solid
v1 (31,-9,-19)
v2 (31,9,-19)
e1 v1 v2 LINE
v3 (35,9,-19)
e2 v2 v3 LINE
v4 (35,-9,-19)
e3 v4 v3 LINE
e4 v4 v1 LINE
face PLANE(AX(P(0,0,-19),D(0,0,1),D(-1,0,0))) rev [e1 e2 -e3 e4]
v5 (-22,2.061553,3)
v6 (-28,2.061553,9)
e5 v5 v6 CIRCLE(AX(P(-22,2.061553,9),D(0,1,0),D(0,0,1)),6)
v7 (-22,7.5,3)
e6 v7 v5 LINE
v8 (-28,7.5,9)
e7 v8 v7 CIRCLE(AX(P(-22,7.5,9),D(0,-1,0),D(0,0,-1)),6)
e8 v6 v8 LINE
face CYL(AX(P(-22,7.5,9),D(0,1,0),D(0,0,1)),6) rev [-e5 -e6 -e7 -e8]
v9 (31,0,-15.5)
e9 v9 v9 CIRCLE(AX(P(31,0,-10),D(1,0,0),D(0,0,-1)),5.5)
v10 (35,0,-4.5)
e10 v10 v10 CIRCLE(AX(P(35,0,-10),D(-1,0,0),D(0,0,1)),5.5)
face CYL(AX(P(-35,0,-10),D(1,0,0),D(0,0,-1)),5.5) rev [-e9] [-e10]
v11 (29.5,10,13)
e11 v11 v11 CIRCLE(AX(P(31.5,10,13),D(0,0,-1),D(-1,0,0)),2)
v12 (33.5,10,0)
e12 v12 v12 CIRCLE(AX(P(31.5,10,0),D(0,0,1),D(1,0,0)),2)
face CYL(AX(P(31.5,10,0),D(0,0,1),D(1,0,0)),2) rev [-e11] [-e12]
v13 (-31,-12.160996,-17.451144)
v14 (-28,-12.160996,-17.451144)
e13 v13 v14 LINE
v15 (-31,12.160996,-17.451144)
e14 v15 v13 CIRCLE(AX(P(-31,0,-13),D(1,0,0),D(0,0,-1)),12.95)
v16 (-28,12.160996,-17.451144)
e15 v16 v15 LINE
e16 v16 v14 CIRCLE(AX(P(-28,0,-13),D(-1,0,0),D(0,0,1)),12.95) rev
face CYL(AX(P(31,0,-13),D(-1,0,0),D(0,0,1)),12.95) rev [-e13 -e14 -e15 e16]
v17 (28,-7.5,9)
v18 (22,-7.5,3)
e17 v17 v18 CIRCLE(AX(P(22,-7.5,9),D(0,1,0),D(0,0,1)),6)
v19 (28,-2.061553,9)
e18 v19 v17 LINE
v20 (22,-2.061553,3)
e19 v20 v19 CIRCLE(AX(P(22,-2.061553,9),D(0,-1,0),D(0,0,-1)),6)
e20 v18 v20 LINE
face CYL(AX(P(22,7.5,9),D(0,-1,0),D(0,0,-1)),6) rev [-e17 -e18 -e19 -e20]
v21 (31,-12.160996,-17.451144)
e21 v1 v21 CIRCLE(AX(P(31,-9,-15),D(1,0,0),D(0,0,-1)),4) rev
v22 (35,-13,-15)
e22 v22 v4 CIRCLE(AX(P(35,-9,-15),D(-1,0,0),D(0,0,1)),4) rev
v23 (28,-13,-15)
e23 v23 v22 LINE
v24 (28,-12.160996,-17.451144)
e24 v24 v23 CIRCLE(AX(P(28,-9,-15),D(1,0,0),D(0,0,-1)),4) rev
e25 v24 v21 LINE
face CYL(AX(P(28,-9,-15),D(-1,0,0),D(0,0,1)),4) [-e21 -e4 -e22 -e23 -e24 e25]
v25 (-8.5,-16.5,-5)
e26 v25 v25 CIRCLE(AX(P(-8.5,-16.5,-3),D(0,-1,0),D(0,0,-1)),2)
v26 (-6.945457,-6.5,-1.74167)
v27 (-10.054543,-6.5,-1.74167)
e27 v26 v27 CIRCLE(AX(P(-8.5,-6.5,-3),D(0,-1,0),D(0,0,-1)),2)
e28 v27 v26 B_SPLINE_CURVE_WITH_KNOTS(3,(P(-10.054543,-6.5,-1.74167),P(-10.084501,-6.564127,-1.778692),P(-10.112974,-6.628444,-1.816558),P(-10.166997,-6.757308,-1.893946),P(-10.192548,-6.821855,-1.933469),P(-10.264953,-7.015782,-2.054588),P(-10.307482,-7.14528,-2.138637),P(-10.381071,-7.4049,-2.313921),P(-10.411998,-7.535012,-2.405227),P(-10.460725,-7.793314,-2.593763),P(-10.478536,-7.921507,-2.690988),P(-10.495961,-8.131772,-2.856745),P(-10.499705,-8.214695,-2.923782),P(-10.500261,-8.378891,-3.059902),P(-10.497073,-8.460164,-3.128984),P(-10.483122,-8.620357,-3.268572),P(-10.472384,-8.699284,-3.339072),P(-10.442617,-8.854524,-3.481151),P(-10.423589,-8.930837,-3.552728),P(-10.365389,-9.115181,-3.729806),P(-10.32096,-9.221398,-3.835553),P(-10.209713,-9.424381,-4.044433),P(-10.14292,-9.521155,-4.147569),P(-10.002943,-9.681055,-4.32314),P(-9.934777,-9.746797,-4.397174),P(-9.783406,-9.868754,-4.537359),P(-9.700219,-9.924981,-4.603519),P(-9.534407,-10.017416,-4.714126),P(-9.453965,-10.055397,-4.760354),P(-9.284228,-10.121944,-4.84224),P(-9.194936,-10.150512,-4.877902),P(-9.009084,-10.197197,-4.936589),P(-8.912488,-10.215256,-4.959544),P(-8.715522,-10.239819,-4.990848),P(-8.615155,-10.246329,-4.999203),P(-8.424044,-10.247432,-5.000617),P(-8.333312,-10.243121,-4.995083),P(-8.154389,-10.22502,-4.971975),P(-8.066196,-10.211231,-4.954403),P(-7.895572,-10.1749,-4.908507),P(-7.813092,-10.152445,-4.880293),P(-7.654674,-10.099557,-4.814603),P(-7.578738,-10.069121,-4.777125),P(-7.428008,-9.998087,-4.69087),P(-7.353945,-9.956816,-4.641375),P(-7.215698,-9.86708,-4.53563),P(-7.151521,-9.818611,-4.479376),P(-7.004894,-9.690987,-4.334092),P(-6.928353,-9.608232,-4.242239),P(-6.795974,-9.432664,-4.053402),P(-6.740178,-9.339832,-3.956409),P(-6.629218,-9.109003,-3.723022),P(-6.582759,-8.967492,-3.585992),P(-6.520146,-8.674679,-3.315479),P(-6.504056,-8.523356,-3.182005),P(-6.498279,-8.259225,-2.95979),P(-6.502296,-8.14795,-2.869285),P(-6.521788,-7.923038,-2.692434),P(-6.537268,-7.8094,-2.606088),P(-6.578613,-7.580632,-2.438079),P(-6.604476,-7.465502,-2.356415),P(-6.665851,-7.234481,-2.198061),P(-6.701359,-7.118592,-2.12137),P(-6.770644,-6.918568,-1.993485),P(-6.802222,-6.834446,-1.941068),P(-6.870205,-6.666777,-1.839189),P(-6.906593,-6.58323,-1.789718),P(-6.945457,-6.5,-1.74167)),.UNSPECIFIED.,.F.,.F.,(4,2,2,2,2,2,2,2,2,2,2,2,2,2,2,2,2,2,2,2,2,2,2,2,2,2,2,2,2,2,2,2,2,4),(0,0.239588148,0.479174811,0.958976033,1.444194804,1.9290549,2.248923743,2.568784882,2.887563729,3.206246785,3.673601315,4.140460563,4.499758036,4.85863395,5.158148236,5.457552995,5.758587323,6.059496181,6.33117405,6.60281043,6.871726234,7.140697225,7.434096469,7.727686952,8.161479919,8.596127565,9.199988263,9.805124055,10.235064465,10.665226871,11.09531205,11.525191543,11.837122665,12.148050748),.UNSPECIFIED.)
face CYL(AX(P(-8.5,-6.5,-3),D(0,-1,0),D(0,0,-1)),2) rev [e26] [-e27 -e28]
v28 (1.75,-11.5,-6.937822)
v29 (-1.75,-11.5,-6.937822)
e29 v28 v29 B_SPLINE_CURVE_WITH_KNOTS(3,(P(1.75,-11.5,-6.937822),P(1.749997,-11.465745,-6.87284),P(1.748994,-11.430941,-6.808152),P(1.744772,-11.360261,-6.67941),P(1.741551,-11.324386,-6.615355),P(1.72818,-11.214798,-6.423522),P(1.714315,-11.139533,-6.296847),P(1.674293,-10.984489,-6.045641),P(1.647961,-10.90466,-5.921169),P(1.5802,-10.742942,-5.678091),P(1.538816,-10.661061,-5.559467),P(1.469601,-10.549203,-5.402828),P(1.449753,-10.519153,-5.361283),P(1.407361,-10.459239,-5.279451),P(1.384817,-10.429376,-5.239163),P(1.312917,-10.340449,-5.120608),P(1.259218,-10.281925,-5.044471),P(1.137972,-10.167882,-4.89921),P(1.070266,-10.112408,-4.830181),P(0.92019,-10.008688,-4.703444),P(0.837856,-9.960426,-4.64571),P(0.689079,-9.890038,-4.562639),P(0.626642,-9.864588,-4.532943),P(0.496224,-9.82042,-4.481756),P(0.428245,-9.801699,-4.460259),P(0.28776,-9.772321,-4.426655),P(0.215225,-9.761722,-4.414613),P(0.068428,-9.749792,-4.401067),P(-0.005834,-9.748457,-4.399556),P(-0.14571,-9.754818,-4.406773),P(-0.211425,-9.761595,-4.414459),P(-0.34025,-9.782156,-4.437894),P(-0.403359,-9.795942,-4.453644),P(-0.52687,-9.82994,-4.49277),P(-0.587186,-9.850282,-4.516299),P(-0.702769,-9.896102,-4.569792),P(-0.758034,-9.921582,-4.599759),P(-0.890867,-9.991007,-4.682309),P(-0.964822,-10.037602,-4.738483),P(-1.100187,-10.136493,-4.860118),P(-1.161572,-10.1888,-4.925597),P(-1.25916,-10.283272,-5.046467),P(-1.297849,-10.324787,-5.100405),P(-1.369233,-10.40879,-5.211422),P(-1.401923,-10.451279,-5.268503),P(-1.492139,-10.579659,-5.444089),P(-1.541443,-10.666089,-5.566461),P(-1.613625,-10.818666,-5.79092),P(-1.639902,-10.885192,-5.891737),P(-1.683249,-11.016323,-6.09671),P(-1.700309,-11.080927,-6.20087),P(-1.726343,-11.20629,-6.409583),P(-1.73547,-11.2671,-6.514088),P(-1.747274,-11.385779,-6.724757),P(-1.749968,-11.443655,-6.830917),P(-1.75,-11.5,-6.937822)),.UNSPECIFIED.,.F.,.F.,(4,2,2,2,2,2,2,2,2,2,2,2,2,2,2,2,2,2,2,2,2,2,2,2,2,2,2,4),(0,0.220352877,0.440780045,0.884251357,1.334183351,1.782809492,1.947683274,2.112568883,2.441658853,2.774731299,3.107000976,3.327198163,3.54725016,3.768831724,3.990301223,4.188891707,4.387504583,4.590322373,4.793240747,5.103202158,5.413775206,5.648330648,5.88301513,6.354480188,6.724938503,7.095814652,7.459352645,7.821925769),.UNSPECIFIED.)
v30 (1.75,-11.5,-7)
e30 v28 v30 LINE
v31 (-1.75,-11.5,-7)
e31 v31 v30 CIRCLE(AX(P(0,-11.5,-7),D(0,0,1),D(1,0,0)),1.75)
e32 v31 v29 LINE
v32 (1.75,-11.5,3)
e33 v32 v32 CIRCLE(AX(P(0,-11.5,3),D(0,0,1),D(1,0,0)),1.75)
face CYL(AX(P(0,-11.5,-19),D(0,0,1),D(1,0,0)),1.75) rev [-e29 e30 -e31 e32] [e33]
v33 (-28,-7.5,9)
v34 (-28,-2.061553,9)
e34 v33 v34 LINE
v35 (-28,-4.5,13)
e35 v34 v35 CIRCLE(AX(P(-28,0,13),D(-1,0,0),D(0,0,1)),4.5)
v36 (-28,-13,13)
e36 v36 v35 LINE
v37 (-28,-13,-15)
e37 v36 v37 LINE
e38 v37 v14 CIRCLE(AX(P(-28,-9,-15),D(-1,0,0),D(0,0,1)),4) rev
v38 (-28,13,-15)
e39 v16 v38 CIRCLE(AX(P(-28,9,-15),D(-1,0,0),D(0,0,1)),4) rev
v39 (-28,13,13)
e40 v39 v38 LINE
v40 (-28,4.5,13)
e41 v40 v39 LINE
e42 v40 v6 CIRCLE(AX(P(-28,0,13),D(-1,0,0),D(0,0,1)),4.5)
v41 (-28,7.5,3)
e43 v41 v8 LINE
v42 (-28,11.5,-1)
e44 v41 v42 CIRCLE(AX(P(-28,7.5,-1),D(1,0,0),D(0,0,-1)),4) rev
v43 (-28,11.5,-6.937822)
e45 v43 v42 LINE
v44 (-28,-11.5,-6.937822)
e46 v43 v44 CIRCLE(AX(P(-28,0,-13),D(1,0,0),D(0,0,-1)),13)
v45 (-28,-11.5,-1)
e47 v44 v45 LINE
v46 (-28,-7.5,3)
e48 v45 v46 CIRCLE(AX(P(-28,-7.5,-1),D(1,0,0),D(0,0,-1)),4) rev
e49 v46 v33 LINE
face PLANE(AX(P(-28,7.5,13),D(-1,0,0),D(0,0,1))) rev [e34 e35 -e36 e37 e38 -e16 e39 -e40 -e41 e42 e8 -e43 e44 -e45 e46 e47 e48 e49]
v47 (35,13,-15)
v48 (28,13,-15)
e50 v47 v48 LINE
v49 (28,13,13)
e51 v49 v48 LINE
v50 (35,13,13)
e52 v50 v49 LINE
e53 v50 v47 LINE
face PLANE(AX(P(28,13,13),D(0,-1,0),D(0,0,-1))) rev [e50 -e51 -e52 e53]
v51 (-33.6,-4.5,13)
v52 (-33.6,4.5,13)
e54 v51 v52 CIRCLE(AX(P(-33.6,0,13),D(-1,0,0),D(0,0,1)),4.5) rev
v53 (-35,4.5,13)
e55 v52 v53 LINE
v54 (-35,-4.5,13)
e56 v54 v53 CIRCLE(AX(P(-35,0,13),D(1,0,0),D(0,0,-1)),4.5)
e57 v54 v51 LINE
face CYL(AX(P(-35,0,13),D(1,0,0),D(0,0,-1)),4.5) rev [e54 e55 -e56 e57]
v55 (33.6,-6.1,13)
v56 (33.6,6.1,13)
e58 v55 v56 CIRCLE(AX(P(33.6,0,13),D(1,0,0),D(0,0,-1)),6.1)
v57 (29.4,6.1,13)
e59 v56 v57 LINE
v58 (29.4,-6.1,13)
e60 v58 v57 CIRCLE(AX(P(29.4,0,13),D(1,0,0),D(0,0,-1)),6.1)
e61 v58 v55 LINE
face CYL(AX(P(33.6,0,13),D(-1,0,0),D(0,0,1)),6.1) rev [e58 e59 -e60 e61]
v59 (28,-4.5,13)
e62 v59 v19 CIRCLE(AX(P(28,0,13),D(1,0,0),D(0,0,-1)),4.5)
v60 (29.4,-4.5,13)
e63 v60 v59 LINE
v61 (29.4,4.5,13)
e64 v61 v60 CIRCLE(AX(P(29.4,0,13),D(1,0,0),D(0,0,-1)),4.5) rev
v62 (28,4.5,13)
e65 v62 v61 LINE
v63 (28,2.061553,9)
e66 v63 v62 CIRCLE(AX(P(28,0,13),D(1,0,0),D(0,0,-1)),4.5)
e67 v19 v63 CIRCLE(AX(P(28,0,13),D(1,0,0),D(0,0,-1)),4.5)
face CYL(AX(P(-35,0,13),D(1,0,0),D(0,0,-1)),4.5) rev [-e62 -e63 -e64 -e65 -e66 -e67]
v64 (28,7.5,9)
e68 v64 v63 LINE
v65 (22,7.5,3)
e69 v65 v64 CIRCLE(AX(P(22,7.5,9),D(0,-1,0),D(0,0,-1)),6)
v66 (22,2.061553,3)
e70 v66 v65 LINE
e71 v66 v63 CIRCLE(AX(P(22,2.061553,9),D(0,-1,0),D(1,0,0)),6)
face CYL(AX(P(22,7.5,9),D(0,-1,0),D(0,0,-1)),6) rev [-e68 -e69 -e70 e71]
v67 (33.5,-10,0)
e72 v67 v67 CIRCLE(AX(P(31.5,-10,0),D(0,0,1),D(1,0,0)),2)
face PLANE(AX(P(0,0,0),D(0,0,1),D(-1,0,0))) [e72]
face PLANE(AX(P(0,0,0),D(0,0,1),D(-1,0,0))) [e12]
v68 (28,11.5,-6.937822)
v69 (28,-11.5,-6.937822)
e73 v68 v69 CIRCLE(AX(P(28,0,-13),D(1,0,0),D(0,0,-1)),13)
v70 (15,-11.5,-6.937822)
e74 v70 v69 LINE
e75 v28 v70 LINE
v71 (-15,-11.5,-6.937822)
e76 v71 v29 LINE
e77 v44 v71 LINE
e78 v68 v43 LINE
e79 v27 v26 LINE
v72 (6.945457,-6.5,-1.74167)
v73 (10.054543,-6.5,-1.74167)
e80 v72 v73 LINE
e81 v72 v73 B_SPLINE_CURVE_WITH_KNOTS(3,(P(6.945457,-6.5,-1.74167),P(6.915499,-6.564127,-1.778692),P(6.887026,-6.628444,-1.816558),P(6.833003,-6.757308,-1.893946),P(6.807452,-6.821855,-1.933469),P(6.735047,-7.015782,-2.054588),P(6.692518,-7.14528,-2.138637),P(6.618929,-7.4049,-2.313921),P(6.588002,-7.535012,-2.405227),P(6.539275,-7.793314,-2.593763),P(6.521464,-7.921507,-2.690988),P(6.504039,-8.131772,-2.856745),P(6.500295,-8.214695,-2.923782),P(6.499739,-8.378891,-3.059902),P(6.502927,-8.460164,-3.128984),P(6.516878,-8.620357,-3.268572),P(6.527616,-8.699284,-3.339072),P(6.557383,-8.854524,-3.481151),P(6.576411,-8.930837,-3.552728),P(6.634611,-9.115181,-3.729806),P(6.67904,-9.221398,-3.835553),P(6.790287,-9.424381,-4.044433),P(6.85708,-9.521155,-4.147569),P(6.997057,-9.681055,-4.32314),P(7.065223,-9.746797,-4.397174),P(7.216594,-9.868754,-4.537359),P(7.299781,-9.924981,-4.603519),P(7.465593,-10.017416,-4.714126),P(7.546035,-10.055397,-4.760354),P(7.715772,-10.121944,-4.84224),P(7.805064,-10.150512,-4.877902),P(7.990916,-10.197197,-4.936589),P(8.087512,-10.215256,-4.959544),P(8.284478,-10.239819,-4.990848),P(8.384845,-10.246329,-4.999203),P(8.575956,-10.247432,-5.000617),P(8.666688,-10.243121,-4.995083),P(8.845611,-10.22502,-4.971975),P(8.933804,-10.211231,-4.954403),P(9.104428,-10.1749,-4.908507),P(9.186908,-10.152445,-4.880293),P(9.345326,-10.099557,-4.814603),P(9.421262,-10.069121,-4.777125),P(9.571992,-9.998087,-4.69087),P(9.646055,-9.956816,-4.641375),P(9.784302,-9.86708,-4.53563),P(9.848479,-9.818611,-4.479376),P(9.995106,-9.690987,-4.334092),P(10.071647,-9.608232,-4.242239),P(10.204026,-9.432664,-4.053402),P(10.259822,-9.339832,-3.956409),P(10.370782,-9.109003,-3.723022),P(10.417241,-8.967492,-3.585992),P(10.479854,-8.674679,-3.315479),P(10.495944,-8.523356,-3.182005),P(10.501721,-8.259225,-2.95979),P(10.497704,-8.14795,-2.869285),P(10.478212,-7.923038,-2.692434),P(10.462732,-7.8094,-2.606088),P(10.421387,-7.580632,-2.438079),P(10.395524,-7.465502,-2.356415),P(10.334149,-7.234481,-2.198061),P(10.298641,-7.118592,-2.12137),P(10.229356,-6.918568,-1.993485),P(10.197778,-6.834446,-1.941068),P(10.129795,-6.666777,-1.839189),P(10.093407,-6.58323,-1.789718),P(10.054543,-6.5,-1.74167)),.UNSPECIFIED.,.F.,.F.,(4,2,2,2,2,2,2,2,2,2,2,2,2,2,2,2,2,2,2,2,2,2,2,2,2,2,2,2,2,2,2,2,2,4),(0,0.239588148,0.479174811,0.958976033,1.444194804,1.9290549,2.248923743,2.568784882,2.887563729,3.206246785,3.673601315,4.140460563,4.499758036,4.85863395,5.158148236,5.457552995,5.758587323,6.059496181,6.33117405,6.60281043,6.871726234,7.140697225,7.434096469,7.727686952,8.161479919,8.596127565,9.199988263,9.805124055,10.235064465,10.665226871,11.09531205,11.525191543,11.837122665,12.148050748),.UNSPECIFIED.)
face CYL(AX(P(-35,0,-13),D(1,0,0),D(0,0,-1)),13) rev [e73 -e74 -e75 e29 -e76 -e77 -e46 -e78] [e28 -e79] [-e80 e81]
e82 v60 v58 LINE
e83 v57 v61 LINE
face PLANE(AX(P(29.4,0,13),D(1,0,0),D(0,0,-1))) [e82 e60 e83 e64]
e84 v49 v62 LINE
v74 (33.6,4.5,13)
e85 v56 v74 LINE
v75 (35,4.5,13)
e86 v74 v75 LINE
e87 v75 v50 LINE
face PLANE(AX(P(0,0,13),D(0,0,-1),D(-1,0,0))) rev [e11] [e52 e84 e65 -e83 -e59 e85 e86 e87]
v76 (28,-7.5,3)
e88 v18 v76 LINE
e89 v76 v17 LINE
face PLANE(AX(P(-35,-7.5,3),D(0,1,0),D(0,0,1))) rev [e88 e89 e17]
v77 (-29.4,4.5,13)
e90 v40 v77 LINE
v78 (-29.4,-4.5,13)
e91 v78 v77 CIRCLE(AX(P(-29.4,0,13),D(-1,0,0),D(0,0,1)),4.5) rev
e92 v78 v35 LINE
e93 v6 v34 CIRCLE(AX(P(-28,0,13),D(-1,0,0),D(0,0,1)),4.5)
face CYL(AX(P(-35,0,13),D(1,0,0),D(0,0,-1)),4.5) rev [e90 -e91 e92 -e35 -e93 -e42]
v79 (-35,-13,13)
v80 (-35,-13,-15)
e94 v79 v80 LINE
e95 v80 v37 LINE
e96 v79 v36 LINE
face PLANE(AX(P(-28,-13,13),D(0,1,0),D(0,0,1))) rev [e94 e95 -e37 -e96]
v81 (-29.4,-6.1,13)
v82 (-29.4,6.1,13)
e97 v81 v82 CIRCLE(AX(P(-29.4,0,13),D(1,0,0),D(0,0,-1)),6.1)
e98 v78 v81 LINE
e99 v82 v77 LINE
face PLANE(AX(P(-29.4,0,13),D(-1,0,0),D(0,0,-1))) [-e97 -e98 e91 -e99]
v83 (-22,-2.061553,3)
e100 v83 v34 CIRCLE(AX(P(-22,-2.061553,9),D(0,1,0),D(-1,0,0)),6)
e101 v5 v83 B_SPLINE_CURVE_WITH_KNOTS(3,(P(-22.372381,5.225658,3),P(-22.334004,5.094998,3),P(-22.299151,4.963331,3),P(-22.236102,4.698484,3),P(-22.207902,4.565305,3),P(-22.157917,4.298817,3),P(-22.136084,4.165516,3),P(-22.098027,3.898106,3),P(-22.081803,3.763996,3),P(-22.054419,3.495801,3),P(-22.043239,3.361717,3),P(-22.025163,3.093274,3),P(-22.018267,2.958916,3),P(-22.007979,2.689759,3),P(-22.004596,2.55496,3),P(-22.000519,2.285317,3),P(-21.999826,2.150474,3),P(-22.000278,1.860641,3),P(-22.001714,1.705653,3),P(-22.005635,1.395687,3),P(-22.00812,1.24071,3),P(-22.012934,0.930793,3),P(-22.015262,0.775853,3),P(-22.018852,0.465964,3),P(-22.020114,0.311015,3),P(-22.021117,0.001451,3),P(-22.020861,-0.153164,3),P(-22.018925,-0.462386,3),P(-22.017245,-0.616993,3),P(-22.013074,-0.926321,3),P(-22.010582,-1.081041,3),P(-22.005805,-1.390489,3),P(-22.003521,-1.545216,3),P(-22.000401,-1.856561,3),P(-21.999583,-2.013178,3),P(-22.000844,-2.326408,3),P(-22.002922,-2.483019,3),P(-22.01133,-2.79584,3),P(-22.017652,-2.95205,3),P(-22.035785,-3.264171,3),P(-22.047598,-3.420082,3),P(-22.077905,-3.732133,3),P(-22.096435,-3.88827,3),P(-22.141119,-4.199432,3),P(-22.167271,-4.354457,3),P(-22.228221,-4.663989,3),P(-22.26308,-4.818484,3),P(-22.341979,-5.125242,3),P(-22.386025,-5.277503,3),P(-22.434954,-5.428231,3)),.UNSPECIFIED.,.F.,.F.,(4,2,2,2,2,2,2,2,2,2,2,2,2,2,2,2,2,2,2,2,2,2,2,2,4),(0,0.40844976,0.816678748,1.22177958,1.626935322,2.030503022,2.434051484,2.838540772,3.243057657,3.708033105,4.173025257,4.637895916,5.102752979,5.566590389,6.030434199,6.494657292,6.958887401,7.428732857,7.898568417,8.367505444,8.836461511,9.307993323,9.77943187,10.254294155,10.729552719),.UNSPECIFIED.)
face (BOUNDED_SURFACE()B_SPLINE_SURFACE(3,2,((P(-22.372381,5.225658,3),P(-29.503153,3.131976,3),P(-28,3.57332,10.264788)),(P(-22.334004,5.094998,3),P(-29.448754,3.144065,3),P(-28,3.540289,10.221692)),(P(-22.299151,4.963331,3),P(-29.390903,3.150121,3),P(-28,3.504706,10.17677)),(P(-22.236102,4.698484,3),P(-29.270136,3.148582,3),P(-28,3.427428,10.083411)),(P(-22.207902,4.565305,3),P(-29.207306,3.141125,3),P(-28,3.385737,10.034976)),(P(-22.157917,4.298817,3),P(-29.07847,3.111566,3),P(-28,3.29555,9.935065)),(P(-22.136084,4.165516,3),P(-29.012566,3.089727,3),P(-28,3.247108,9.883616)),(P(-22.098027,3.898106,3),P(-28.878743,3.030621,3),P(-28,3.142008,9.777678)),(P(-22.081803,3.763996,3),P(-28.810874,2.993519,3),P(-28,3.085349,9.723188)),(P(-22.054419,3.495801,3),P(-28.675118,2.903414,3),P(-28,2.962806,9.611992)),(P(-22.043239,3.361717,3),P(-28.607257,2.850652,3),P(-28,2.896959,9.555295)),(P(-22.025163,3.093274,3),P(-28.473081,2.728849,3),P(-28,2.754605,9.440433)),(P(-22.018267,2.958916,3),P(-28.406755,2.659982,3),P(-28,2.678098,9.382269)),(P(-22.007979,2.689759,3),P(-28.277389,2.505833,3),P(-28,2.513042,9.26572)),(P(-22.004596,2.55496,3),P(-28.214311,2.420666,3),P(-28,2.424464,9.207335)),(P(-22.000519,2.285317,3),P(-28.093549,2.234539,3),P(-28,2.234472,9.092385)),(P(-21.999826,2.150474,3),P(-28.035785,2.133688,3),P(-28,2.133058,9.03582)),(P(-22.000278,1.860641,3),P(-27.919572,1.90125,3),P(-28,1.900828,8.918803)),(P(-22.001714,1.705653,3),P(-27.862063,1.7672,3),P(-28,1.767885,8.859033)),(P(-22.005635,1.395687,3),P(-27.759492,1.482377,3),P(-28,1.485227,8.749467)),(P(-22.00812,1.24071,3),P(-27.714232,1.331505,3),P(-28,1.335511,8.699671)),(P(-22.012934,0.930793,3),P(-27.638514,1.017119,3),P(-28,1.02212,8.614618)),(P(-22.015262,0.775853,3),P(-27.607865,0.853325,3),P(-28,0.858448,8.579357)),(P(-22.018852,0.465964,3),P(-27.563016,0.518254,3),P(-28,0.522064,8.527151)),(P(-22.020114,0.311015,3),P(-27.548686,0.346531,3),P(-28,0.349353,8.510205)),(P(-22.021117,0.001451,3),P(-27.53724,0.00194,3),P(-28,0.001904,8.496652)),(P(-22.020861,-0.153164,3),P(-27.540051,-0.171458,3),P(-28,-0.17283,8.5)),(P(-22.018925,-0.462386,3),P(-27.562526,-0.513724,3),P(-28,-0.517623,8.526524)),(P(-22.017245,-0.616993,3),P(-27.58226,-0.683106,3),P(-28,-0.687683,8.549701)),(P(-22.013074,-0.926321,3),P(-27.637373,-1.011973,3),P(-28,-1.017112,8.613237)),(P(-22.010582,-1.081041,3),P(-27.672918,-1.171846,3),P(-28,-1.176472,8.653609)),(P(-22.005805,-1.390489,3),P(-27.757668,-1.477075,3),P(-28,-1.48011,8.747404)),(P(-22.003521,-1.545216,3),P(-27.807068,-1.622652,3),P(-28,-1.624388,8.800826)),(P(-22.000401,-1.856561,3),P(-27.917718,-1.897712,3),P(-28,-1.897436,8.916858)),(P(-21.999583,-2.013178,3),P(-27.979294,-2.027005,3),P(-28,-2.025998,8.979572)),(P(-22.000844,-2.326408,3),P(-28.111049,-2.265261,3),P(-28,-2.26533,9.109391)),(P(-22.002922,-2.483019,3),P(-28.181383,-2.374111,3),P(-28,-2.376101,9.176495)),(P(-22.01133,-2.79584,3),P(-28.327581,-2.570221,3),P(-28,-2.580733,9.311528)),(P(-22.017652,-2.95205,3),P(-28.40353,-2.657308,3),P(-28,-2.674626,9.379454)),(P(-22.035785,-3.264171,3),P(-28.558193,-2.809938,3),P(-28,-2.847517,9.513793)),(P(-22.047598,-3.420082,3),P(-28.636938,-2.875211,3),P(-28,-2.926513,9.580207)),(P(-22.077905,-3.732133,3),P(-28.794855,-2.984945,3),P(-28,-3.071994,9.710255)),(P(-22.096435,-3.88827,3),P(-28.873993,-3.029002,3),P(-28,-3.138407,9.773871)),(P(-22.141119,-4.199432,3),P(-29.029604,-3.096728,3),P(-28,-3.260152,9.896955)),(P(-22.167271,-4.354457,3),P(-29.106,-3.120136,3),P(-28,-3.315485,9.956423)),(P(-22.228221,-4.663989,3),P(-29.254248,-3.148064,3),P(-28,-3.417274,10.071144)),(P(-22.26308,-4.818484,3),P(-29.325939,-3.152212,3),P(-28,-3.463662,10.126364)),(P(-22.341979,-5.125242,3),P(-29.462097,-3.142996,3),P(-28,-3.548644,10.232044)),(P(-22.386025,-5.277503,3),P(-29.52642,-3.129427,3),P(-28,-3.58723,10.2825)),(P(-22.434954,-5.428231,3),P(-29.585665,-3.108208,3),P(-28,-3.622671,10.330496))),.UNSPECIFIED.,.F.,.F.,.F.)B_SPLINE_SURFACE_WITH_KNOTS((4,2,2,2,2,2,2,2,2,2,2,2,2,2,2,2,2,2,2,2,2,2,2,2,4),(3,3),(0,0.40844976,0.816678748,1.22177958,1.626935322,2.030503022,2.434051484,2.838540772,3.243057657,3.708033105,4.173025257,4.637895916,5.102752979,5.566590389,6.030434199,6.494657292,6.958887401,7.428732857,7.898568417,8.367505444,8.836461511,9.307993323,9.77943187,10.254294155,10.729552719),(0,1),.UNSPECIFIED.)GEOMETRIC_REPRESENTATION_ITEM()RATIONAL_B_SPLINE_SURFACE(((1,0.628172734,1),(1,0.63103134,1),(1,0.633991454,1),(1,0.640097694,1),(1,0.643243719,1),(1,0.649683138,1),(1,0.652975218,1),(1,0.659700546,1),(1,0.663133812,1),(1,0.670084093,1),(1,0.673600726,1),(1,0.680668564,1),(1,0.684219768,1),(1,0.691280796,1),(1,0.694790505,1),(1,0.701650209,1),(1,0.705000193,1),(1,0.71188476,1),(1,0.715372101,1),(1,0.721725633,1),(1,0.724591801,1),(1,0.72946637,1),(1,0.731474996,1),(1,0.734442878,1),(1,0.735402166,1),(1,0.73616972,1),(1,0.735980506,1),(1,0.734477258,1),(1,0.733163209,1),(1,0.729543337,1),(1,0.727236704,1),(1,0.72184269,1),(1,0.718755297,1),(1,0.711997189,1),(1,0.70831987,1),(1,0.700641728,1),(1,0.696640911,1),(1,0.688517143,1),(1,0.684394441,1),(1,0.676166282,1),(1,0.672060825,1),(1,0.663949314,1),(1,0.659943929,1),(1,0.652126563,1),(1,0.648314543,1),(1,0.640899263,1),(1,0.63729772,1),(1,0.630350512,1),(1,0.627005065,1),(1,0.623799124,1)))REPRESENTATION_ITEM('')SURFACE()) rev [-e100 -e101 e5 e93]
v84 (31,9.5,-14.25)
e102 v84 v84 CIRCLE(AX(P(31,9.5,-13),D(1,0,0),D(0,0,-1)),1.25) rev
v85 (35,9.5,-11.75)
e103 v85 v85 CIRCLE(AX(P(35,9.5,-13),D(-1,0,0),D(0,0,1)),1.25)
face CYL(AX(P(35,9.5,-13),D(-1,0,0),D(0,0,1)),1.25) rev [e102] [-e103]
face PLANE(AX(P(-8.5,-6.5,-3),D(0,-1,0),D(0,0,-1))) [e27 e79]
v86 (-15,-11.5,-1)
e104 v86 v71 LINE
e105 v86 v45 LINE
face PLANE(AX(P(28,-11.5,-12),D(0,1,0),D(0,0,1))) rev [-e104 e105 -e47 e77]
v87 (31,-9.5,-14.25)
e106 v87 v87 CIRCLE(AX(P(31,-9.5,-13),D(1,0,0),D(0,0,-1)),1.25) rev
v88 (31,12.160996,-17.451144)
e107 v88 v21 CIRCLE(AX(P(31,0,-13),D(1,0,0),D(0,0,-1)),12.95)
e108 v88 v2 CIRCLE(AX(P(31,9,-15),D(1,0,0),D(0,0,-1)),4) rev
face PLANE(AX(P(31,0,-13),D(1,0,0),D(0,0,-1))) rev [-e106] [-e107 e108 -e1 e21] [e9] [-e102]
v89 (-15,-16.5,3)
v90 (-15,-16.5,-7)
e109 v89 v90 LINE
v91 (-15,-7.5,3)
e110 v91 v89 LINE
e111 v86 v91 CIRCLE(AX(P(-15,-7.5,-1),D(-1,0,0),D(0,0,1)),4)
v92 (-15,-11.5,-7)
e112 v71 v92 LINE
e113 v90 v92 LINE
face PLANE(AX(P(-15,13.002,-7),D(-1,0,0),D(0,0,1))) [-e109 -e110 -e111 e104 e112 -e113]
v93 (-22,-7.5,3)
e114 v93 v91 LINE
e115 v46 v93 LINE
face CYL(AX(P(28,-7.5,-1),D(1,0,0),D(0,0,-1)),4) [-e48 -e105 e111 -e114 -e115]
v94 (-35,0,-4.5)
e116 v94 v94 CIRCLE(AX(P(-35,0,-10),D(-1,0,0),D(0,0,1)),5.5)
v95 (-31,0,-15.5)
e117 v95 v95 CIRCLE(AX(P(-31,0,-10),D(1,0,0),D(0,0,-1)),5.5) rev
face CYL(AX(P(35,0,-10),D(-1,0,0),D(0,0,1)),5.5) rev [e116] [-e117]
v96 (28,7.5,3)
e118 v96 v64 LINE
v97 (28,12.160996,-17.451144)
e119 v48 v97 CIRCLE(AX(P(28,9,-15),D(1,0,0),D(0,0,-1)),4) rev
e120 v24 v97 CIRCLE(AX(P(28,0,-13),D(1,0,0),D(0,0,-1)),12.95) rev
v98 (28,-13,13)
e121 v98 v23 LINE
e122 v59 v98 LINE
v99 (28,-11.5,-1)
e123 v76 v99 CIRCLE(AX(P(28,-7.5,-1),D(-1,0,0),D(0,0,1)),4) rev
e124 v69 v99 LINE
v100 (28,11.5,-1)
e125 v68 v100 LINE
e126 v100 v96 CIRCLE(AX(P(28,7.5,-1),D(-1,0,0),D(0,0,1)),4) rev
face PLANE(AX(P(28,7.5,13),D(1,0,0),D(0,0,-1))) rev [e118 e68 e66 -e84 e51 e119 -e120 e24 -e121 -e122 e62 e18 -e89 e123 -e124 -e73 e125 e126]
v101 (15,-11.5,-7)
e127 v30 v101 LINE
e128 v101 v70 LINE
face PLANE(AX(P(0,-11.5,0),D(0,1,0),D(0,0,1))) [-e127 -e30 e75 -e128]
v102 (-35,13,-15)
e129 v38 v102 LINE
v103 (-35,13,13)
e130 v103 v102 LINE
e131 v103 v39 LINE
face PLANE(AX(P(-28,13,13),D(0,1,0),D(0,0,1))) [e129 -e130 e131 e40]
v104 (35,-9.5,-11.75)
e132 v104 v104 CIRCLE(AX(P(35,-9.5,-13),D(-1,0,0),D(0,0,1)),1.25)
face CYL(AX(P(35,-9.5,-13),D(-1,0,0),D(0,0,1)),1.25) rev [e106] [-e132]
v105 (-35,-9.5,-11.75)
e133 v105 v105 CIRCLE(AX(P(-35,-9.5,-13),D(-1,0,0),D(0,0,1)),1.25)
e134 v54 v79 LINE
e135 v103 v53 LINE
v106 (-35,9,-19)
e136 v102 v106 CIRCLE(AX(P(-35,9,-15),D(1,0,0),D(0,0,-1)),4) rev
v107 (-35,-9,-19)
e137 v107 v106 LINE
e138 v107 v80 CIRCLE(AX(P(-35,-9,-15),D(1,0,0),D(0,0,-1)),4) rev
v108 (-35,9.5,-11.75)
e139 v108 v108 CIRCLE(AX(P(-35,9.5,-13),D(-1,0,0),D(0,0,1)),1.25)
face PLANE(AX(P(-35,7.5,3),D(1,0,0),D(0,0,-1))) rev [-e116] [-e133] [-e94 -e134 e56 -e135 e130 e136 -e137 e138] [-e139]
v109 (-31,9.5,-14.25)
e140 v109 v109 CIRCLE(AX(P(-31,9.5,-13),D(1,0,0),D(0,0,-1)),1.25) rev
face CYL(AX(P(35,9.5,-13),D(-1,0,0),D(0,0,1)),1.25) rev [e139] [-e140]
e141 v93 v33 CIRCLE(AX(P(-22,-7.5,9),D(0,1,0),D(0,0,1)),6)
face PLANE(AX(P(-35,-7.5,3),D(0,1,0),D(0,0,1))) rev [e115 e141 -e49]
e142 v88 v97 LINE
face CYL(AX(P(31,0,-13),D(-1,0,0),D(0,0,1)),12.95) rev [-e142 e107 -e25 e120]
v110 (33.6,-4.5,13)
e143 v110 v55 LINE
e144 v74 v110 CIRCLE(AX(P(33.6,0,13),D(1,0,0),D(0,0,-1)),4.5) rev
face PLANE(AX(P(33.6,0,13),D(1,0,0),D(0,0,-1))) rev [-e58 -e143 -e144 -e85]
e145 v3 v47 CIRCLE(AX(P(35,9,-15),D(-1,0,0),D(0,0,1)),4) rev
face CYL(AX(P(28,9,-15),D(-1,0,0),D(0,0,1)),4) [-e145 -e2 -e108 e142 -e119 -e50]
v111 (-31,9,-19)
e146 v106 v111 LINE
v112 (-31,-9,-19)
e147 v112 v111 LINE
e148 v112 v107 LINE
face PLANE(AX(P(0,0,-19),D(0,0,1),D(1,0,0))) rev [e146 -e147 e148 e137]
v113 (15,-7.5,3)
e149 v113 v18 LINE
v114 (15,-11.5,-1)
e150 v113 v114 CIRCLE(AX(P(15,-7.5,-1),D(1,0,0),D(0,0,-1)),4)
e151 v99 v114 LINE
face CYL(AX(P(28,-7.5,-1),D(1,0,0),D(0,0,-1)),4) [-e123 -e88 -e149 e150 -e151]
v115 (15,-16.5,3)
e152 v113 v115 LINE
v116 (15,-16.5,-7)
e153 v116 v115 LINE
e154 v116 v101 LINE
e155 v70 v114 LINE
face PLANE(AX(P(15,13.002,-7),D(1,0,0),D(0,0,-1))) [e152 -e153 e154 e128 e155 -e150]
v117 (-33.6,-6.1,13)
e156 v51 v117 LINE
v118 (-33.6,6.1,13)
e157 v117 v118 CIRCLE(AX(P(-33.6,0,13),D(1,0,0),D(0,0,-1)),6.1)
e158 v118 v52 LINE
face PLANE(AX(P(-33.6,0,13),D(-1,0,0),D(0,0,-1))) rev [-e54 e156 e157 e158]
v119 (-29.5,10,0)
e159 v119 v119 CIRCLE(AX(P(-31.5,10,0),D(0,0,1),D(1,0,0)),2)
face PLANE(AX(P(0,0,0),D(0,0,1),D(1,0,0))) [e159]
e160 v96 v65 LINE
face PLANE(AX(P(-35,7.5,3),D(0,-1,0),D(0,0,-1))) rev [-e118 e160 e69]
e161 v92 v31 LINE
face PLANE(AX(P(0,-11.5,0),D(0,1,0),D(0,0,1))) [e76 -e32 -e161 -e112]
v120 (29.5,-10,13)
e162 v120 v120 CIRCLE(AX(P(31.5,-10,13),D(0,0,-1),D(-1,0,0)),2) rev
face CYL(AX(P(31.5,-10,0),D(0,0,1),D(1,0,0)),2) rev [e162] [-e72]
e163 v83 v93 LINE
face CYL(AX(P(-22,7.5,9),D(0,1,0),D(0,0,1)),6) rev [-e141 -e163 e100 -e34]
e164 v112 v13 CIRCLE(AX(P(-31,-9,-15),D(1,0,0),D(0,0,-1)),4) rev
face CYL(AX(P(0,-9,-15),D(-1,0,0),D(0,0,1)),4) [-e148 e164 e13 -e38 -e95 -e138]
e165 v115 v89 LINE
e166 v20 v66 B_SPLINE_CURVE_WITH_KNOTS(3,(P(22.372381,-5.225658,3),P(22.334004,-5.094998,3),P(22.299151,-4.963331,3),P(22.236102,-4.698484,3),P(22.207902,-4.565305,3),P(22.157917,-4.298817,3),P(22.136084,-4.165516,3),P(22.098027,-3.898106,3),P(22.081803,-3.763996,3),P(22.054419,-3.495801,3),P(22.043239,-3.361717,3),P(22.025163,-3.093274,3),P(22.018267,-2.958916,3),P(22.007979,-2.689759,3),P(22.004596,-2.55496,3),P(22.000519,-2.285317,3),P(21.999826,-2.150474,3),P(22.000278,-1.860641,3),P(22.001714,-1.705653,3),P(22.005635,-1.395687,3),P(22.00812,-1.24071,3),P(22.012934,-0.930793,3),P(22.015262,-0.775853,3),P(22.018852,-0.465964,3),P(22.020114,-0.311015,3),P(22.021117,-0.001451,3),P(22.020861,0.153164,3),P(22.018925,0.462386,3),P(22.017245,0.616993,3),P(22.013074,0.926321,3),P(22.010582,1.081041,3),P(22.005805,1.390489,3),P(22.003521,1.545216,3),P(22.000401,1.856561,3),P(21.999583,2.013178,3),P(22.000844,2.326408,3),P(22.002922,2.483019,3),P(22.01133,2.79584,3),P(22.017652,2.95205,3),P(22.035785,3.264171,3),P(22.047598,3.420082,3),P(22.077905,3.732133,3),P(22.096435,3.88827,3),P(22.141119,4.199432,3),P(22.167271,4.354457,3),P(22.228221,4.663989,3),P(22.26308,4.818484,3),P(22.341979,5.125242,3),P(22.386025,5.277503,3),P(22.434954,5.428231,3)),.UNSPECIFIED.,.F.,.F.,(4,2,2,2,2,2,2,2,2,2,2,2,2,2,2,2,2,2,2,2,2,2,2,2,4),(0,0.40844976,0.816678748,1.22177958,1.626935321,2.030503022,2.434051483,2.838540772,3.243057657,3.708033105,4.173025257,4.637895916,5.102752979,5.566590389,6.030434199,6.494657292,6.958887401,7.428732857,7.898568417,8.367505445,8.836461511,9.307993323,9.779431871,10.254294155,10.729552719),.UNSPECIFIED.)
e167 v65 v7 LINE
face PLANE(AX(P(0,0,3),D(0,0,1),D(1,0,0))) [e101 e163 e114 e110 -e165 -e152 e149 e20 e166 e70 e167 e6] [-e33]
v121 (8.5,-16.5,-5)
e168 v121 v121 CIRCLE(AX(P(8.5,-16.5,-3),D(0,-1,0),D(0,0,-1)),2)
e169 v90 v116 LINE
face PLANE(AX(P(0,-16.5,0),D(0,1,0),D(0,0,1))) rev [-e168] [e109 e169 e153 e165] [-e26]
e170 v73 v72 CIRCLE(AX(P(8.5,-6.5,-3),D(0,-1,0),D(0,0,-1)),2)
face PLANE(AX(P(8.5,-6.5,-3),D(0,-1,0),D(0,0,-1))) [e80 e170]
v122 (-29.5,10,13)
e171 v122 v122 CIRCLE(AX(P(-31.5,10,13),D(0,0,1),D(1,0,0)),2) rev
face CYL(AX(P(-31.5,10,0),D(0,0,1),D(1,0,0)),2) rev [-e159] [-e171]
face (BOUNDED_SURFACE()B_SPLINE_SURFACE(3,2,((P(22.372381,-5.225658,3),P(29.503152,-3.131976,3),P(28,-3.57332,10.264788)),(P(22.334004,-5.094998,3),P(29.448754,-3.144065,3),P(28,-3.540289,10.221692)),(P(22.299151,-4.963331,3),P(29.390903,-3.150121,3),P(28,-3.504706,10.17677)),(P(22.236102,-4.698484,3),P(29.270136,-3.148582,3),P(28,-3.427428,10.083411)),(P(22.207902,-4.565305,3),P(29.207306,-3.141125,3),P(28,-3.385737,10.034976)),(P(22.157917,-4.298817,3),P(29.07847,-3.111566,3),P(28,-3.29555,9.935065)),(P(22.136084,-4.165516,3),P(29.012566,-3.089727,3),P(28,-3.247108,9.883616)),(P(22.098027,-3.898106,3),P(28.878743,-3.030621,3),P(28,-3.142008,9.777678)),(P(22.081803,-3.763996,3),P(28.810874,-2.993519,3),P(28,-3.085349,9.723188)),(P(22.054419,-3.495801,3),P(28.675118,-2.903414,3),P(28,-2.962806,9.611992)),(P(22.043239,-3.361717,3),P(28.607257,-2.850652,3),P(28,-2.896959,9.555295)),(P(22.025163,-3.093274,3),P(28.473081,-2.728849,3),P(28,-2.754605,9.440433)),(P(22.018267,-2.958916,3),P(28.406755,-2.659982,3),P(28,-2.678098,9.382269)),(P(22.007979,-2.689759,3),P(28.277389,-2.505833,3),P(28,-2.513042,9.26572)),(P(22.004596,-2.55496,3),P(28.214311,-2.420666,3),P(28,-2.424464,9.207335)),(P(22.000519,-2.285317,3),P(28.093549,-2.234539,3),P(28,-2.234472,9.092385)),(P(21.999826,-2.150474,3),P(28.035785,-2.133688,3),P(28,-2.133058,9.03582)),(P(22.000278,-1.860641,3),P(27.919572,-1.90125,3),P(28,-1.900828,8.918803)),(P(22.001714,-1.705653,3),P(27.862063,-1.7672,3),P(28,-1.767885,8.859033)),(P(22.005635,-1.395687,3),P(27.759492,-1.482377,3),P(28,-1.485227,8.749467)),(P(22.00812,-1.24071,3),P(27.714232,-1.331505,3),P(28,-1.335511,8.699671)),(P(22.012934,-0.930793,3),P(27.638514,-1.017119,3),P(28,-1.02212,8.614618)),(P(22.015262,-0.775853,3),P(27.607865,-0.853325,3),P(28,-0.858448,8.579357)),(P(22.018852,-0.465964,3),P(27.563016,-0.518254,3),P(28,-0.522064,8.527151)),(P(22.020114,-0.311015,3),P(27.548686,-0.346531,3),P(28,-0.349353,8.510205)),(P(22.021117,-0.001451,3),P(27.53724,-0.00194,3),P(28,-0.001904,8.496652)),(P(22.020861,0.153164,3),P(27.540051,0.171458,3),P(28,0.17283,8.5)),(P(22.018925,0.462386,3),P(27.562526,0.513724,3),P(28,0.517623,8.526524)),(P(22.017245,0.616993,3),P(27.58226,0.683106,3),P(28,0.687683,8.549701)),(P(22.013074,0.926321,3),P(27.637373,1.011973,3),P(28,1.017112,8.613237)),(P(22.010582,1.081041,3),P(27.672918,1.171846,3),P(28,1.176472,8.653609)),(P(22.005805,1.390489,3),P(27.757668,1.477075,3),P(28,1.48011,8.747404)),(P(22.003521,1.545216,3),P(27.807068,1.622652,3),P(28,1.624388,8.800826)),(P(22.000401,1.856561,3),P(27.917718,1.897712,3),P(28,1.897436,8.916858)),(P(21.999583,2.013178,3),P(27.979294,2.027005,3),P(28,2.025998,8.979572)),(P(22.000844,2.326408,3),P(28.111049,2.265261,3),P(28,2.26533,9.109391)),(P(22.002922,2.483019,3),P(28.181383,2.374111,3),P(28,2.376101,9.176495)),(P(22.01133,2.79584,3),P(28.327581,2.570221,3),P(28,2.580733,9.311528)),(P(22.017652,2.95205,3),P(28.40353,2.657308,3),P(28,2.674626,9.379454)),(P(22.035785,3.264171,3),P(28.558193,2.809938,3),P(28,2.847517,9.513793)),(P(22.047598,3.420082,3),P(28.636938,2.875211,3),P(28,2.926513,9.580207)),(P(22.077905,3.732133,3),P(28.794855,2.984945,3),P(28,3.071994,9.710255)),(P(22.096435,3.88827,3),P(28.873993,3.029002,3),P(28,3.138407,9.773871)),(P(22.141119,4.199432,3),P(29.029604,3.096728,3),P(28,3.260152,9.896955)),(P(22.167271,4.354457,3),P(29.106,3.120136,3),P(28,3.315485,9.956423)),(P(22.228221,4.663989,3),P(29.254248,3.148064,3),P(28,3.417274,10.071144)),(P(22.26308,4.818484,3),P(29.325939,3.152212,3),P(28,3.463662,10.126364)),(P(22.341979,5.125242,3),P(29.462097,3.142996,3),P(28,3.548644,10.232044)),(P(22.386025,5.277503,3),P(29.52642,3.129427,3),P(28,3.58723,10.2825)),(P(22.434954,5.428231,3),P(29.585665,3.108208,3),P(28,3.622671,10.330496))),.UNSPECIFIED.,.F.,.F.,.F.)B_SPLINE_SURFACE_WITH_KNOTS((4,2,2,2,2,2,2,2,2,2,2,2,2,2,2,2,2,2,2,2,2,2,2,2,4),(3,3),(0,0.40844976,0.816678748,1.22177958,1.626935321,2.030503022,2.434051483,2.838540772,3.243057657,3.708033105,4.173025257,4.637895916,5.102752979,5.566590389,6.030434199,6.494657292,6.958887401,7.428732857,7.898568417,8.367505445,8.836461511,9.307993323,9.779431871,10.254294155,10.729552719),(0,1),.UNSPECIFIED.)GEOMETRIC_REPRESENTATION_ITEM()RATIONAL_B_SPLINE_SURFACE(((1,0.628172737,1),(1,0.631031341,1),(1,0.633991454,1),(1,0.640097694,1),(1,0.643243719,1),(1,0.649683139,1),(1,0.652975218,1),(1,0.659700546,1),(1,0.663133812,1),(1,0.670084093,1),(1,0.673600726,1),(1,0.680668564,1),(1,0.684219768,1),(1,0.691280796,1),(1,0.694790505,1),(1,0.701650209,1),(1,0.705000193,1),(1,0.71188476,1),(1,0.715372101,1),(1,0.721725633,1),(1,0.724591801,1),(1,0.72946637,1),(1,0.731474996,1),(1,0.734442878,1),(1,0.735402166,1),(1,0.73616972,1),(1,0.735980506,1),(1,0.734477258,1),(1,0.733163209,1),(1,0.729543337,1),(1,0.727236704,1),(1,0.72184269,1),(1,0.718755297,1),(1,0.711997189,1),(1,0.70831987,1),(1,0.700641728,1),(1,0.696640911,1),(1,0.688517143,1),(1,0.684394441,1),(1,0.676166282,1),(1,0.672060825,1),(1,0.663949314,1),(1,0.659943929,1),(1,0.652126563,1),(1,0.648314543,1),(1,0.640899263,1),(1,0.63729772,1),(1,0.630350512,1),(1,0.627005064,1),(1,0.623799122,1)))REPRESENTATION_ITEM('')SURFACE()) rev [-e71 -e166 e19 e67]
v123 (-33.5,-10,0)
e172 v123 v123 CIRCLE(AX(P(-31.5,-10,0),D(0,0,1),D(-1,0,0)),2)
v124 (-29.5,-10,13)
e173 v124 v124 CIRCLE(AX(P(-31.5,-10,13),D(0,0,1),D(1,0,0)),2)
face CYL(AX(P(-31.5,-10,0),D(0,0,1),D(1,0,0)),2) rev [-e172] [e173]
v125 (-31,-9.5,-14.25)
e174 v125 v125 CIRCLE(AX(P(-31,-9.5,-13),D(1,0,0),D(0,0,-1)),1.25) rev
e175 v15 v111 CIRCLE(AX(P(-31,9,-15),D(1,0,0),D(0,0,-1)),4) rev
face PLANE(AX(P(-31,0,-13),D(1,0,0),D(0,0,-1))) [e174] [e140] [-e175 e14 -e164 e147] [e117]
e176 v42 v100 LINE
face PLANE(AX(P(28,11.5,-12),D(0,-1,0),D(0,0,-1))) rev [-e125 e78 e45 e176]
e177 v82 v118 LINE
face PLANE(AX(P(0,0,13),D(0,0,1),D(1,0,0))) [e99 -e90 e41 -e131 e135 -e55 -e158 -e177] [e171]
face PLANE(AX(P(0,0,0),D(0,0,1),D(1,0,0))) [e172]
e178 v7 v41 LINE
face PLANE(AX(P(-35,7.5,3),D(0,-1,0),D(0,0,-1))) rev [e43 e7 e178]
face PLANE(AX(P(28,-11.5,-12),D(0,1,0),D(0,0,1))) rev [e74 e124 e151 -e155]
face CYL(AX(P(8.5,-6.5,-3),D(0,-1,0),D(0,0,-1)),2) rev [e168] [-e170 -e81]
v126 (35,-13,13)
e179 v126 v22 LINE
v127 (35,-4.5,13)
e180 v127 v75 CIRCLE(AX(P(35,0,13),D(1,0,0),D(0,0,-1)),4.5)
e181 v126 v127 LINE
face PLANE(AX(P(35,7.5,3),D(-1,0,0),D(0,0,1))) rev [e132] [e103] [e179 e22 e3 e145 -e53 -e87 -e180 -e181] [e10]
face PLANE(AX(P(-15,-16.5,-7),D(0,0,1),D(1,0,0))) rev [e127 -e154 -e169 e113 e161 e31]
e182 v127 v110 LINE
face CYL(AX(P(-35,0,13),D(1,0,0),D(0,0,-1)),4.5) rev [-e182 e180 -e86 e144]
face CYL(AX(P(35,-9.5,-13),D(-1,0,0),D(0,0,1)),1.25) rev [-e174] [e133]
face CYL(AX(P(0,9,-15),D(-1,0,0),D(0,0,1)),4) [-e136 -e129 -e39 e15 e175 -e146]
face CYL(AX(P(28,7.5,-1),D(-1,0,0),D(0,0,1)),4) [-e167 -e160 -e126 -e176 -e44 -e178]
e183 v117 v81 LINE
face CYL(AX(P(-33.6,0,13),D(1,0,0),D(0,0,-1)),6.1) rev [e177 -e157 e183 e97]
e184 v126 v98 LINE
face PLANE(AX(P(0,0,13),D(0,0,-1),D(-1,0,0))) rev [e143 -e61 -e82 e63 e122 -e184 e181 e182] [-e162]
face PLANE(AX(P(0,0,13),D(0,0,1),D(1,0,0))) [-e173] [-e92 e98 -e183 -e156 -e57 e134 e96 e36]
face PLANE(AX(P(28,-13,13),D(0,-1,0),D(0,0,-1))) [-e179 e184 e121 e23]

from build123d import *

# Parameters (mm, degrees)
SKETCH1_W                                  = 70
SKETCH1_H                                  = 15
BOSS_EXTRUDE1_DEPTH                        = 3
SKETCH2_W                                  = 7
SKETCH2_H                                  = 15
BOSS_EXTRUDE2_DEPTH                        = 10
SKETCH5_R                                  = 4.5
CUT_EXTRUDE1_DEPTH                         = 72.590851371
SKETCH6_R                                  = 6.1
CUT_EXTRUDE4_DEPTH                         = 2.1
BOSS_EXTRUDE3_DEPTH                        = 13
SKETCH8_R                                  = 2
CUT_EXTRUDE5_DEPTH                         = 40.534794802
SKETCH9_R                                  = 1.75
CUT_EXTRUDE6_DEPTH                         = 39.65229618
MIRROR1_AT_THE_SECOND_PLANE_COPY_1_SKETC_R = 6.1
MIRROR1_AT_THE_SECOND_PLANE_COPY_1_DEPTH   = 2.1
MIRROR1_AT_THE_SECOND_PLANE_COPY_2_DEPTH   = 13
MIRROR1_AT_THE_SECOND_PLANE_COPY_3_SKETC_R = 2
MIRROR1_AT_THE_SECOND_PLANE_COPY_3_DEPTH   = 40.534794802
MIRROR1_AT_THE_SECOND_PLANE_COPY_4_SKETC_R = 1.75
MIRROR1_AT_THE_SECOND_PLANE_COPY_4_DEPTH   = 39.65229618
FILLET1_R                                  = 6
SKETCH10_W                                 = 56
SKETCH10_H                                 = 23
BOSS_EXTRUDE4_DEPTH                        = 15
FILLET2_R                                  = 4
SKETCH11_R                                 = 13
CUT_EXTRUDE7_DEPTH                         = 66.627738058
SKETCH14_W                                 = 7
SKETCH14_H                                 = 26
BOSS_EXTRUDE6_DEPTH                        = 5
SKETCH15_W                                 = 7
SKETCH15_H                                 = 26
BOSS_EXTRUDE7_DEPTH                        = 14
FILLET5_R                                  = 4
SKETCH16_R                                 = 5.5
CUT_EXTRUDE9_DEPTH                         = 74.688533708
FILLET5_OF_MIRROR2_R                       = 4
SKETCH17_R                                 = 1.25
CUT_EXTRUDE10_DEPTH                        = 74.688533708
CUT_EXTRUDE14_DEPTH                        = 31
CUT_EXTRUDE14_DEPTH_BACK                   = 31
SKETCH18_R                                 = 12.95
SKETCH19_W                                 = 30
SKETCH19_H                                 = 10
BOSS_EXTRUDE8_DEPTH                        = 5
BOSS_EXTRUDE8_DIRECTION_2_REACH            = 48.757
SKETCH20_R                                 = 2
CUT_EXTRUDE15_DEPTH                        = 10
SKETCH21_R                                 = 1.75
CUT_EXTRUDE16_DEPTH                        = 45.511234574


with BuildPart() as part:
    # Sketch1 → Boss-Extrude1 (new body)
    with BuildSketch(Plane.XY):
        Rectangle(SKETCH1_W, SKETCH1_H)
    extrude(amount=BOSS_EXTRUDE1_DEPTH)

    # Sketch2 → Boss-Extrude2 (add)
    with BuildSketch(Plane.XY.offset(3)):
        with Locations((-31.5, 0)):
            Rectangle(SKETCH2_W, SKETCH2_H)
        with Locations((31.5, 0)):
            Rectangle(SKETCH2_W, SKETCH2_H)
    extrude(amount=BOSS_EXTRUDE2_DEPTH)

    # Sketch5 → Cut-Extrude1 (cut, through all)
    with BuildSketch(Plane(origin=(35, 0, 0), x_dir=(0, 0, -1), z_dir=(1, 0, 0))):
        with Locations((-13, 0)):
            Circle(SKETCH5_R)
    extrude(amount=-CUT_EXTRUDE1_DEPTH, mode=Mode.SUBTRACT)

    # Sketch6 → Cut-Extrude4 (cut, symmetric)
    with BuildSketch(Plane(origin=(31.5, 0, 0), x_dir=(0, 0, -1), z_dir=(1, 0, 0))):
        with Locations((-13, 0)):
            Circle(SKETCH6_R)
    cut_extrude4 = extrude(amount=CUT_EXTRUDE4_DEPTH, both=True, mode=Mode.SUBTRACT)

    # Sketch7 → Boss-Extrude3 (add)
    with BuildSketch(Plane.XY):
        Polygon((28, 8.1), (28, 13), (35, 13), (35, 8.1), (35, 4.5), (33.6, 4.5), (33.6, 6.1), (29.4, 6.1), (29.4, 4.5), (28, 4.5), align=None)
    boss_extrude3 = extrude(amount=BOSS_EXTRUDE3_DEPTH)

    # Sketch8 → Cut-Extrude5 (cut, symmetric)
    with BuildSketch(Plane.XY.offset(13)):
        with Locations((31.5, 10)):
            Circle(SKETCH8_R)
    cut_extrude5 = extrude(amount=CUT_EXTRUDE5_DEPTH, both=True, mode=Mode.SUBTRACT)

    # Sketch9 → Cut-Extrude6 (cut, through all)
    with BuildSketch(Plane.XY.offset(3)):
        with Locations((-10, -4)):
            Circle(SKETCH9_R)
    cut_extrude6 = extrude(amount=-CUT_EXTRUDE6_DEPTH, mode=Mode.SUBTRACT)

    # Mirror1: Cut-Extrude4, Boss-Extrude3, Cut-Extrude5, Cut-Extrude6 across plane
    add(cut_extrude4.mirror(Plane(origin=(0, 0, 0), x_dir=(0, 0, 1), z_dir=(1, 0, 0))), mode=Mode.SUBTRACT)
    add(boss_extrude3.mirror(Plane(origin=(0, 0, 0), x_dir=(0, 0, 1), z_dir=(1, 0, 0))))
    add(cut_extrude5.mirror(Plane(origin=(0, 0, 0), x_dir=(0, 0, 1), z_dir=(1, 0, 0))), mode=Mode.SUBTRACT)
    add(cut_extrude6.mirror(Plane(origin=(0, 0, 0), x_dir=(0, 0, 1), z_dir=(1, 0, 0))), mode=Mode.SUBTRACT)

    # Mirror1 at the second plane: Cut-Extrude4, Boss-Extrude3, Cut-Extrude5, Cut-Extrude6 across plane
    add(cut_extrude4.mirror(Plane.ZX), mode=Mode.SUBTRACT)
    add(boss_extrude3.mirror(Plane.ZX))
    add(cut_extrude5.mirror(Plane.ZX), mode=Mode.SUBTRACT)
    add(cut_extrude6.mirror(Plane.ZX), mode=Mode.SUBTRACT)

    # Mirror1 at the second plane copy 1 sketc → Mirror1 at the second plane copy 1 (cut, symmetric)
    with BuildSketch(Plane(origin=(-31.5, 0, 0), x_dir=(0, 0, -1), z_dir=(-1, 0, 0))):
        with Locations((-13, 0)):
            Circle(MIRROR1_AT_THE_SECOND_PLANE_COPY_1_SKETC_R)
    extrude(amount=MIRROR1_AT_THE_SECOND_PLANE_COPY_1_DEPTH, both=True, mode=Mode.SUBTRACT)

    # Mirror1 at the second plane copy 2 sketc → Mirror1 at the second plane copy 2 (add)
    with BuildSketch(Plane(origin=(0, 0, 0), x_dir=(-1, 0, 0), z_dir=(0, 0, 1))):
        Polygon((28, 8.1), (28, 13), (35, 13), (35, 8.1), (35, 4.5), (33.6, 4.5), (33.6, 6.1), (29.4, 6.1), (29.4, 4.5), (28, 4.5), align=None)
    extrude(amount=MIRROR1_AT_THE_SECOND_PLANE_COPY_2_DEPTH)

    # Mirror1 at the second plane copy 3 sketc → Mirror1 at the second plane copy 3 (cut, symmetric)
    with BuildSketch(Plane(origin=(0, 0, 13), x_dir=(-1, 0, 0), z_dir=(0, 0, 1))):
        with Locations((31.5, 10)):
            Circle(MIRROR1_AT_THE_SECOND_PLANE_COPY_3_SKETC_R)
    extrude(amount=MIRROR1_AT_THE_SECOND_PLANE_COPY_3_DEPTH, both=True, mode=Mode.SUBTRACT)

    # Mirror1 at the second plane copy 4 sketc → Mirror1 at the second plane copy 4 (cut, through all)
    with BuildSketch(Plane(origin=(0, 0, 3), x_dir=(-1, 0, 0), z_dir=(0, 0, 1))):
        with Locations((-10, -4)):
            Circle(MIRROR1_AT_THE_SECOND_PLANE_COPY_4_SKETC_R)
    extrude(amount=-MIRROR1_AT_THE_SECOND_PLANE_COPY_4_DEPTH, mode=Mode.SUBTRACT)

    # Fillet1
    fillet1_edges = [part.edges().sort_by_distance(p)[0] for p in [
        (-28, 0, 3),
        (28, 0, 3),
    ]]
    fillet(fillet1_edges, radius=FILLET1_R)

    # Sketch10 → Boss-Extrude4 (add)
    with BuildSketch(Plane(origin=(0, 0, 3), x_dir=(-1, 0, 0), z_dir=(0, 0, -1))):
        Rectangle(SKETCH10_W, SKETCH10_H)
    extrude(amount=BOSS_EXTRUDE4_DEPTH)

    # Fillet2
    # the kernel refuses this fillet: 4 mm, written as the material it takes off along each edge
    with BuildSketch(Plane(origin=(-28, 11.5, 3), x_dir=(0, 0, -1), z_dir=(1, 0, 0)), Plane(origin=(28, -11.5, 3), x_dir=(0, 0, -1), z_dir=(-1, 0, 0))) as fillet2_piece_1:
        with BuildLine():
            CenterArc((FILLET2_R, -FILLET2_R), FILLET2_R, 90, 90)
            Line((0, -FILLET2_R), (0, 0))
            Line((0, 0), (FILLET2_R, 0))
        make_face()
    extrude(amount=56, mode=Mode.SUBTRACT)

    # Sketch11 → Cut-Extrude7 (cut, through all)
    with BuildSketch(Plane(origin=(28, 0, 0), x_dir=(0, 0, -1), z_dir=(1, 0, 0))):
        with Locations((13, 0)):
            Circle(SKETCH11_R)
    extrude(amount=-CUT_EXTRUDE7_DEPTH, mode=Mode.SUBTRACT)

    # Sketch14 → Boss-Extrude6 (add)
    with BuildSketch(Plane(origin=(0, 0, 0), x_dir=(-1, 0, 0), z_dir=(0, 0, -1))):
        with Locations((31.5, 0)):
            Rectangle(SKETCH14_W, SKETCH14_H)
    boss_extrude6 = extrude(amount=BOSS_EXTRUDE6_DEPTH)

    # Sketch15 → Boss-Extrude7 (add)
    with BuildSketch(Plane(origin=(0, 0, -5), x_dir=(-1, 0, 0), z_dir=(0, 0, -1))):
        with Locations((31.5, 0)):
            Rectangle(SKETCH15_W, SKETCH15_H)
    boss_extrude7 = extrude(amount=BOSS_EXTRUDE7_DEPTH)

    # Fillet5
    fillet5_edges = [part.edges().sort_by_distance(p)[0] for p in [
        (-31.5, 13, -19),
        (-31.5, -13, -19),
    ]]
    fillet(fillet5_edges, radius=FILLET5_R)

    # Sketch16 → Cut-Extrude9 (cut, through all)
    with BuildSketch(Plane.ZY.offset(35)):
        with Locations((-10, 0)):
            Circle(SKETCH16_R)
    cut_extrude9 = extrude(amount=-CUT_EXTRUDE9_DEPTH, mode=Mode.SUBTRACT)

    # Mirror2: Boss-Extrude6, Boss-Extrude7, Cut-Extrude9 across plane
    add(boss_extrude6.mirror(Plane(origin=(0, 0, 0), x_dir=(0, 0, 1), z_dir=(1, 0, 0))))
    add(boss_extrude7.mirror(Plane(origin=(0, 0, 0), x_dir=(0, 0, 1), z_dir=(1, 0, 0))))
    add(cut_extrude9.mirror(Plane(origin=(0, 0, 0), x_dir=(0, 0, 1), z_dir=(1, 0, 0))), mode=Mode.SUBTRACT)

    # Fillet5 of Mirror2
    fillet5_of_mirror2_edges = [part.edges().sort_by_distance(p)[0] for p in [
        (31.5, 13, -19),
        (31.5, -13, -19),
    ]]
    fillet(fillet5_of_mirror2_edges, radius=FILLET5_OF_MIRROR2_R)

    # Sketch17 → Cut-Extrude10 (cut, through all)
    with BuildSketch(Plane.ZY.offset(35)):
        with Locations((-13, 9.5)):
            Circle(SKETCH17_R)
        with Locations((-13, -9.5)):
            Circle(SKETCH17_R)
    extrude(amount=-CUT_EXTRUDE10_DEPTH, mode=Mode.SUBTRACT)

    # Sketch18 → Cut-Extrude14 (cut, two sides: drawn at the far end of the back side and taken through both)
    with BuildSketch(Plane(origin=(0, 0, 0), x_dir=(0, 0, -1), z_dir=(1, 0, 0)).offset(-CUT_EXTRUDE14_DEPTH_BACK)):
        with Locations((13, 0)):
            Circle(SKETCH18_R)
    extrude(amount=CUT_EXTRUDE14_DEPTH + CUT_EXTRUDE14_DEPTH_BACK, mode=Mode.SUBTRACT)

    # Sketch19 → Boss-Extrude8 (add)
    with BuildSketch(Plane.XZ.offset(11.5)):
        with Locations((0, -2)):
            Rectangle(SKETCH19_W, SKETCH19_H)
    extrude(amount=BOSS_EXTRUDE8_DEPTH)

    # Sketch19 → Boss-Extrude8 direction 2 (add, up to next)
    with BuildSketch(Plane.XZ.offset(11.5), mode=Mode.PRIVATE) as boss_extrude8_direction_2_sk1:
        with Locations((0, -2)):
            Rectangle(SKETCH19_W, SKETCH19_H)
    boss_extrude8_direction_2_tool1 = extrude(boss_extrude8_direction_2_sk1.sketch, amount=-BOSS_EXTRUDE8_DIRECTION_2_REACH, mode=Mode.PRIVATE) - part.part
    add(boss_extrude8_direction_2_tool1.solids().sort_by_distance((0, -11.5, -2))[0])

    # Sketch20 → Cut-Extrude15 (cut)
    with BuildSketch(Plane.XZ.offset(16.5)):
        with Locations(Location((-8.5, -3, 0), (0, 0, 270))):
            Circle(SKETCH20_R)
        with Locations(Location((8.5, -3, 0), (0, 0, 270))):
            Circle(SKETCH20_R)
    extrude(amount=-CUT_EXTRUDE15_DEPTH, mode=Mode.SUBTRACT)

    # Sketch21 → Cut-Extrude16 (cut, through all)
    with BuildSketch(Plane.XY.offset(3)):
        with Locations((0, -11.5)):
            Circle(SKETCH21_R)
    extrude(amount=-CUT_EXTRUDE16_DEPTH, mode=Mode.SUBTRACT)


solid = part.part
